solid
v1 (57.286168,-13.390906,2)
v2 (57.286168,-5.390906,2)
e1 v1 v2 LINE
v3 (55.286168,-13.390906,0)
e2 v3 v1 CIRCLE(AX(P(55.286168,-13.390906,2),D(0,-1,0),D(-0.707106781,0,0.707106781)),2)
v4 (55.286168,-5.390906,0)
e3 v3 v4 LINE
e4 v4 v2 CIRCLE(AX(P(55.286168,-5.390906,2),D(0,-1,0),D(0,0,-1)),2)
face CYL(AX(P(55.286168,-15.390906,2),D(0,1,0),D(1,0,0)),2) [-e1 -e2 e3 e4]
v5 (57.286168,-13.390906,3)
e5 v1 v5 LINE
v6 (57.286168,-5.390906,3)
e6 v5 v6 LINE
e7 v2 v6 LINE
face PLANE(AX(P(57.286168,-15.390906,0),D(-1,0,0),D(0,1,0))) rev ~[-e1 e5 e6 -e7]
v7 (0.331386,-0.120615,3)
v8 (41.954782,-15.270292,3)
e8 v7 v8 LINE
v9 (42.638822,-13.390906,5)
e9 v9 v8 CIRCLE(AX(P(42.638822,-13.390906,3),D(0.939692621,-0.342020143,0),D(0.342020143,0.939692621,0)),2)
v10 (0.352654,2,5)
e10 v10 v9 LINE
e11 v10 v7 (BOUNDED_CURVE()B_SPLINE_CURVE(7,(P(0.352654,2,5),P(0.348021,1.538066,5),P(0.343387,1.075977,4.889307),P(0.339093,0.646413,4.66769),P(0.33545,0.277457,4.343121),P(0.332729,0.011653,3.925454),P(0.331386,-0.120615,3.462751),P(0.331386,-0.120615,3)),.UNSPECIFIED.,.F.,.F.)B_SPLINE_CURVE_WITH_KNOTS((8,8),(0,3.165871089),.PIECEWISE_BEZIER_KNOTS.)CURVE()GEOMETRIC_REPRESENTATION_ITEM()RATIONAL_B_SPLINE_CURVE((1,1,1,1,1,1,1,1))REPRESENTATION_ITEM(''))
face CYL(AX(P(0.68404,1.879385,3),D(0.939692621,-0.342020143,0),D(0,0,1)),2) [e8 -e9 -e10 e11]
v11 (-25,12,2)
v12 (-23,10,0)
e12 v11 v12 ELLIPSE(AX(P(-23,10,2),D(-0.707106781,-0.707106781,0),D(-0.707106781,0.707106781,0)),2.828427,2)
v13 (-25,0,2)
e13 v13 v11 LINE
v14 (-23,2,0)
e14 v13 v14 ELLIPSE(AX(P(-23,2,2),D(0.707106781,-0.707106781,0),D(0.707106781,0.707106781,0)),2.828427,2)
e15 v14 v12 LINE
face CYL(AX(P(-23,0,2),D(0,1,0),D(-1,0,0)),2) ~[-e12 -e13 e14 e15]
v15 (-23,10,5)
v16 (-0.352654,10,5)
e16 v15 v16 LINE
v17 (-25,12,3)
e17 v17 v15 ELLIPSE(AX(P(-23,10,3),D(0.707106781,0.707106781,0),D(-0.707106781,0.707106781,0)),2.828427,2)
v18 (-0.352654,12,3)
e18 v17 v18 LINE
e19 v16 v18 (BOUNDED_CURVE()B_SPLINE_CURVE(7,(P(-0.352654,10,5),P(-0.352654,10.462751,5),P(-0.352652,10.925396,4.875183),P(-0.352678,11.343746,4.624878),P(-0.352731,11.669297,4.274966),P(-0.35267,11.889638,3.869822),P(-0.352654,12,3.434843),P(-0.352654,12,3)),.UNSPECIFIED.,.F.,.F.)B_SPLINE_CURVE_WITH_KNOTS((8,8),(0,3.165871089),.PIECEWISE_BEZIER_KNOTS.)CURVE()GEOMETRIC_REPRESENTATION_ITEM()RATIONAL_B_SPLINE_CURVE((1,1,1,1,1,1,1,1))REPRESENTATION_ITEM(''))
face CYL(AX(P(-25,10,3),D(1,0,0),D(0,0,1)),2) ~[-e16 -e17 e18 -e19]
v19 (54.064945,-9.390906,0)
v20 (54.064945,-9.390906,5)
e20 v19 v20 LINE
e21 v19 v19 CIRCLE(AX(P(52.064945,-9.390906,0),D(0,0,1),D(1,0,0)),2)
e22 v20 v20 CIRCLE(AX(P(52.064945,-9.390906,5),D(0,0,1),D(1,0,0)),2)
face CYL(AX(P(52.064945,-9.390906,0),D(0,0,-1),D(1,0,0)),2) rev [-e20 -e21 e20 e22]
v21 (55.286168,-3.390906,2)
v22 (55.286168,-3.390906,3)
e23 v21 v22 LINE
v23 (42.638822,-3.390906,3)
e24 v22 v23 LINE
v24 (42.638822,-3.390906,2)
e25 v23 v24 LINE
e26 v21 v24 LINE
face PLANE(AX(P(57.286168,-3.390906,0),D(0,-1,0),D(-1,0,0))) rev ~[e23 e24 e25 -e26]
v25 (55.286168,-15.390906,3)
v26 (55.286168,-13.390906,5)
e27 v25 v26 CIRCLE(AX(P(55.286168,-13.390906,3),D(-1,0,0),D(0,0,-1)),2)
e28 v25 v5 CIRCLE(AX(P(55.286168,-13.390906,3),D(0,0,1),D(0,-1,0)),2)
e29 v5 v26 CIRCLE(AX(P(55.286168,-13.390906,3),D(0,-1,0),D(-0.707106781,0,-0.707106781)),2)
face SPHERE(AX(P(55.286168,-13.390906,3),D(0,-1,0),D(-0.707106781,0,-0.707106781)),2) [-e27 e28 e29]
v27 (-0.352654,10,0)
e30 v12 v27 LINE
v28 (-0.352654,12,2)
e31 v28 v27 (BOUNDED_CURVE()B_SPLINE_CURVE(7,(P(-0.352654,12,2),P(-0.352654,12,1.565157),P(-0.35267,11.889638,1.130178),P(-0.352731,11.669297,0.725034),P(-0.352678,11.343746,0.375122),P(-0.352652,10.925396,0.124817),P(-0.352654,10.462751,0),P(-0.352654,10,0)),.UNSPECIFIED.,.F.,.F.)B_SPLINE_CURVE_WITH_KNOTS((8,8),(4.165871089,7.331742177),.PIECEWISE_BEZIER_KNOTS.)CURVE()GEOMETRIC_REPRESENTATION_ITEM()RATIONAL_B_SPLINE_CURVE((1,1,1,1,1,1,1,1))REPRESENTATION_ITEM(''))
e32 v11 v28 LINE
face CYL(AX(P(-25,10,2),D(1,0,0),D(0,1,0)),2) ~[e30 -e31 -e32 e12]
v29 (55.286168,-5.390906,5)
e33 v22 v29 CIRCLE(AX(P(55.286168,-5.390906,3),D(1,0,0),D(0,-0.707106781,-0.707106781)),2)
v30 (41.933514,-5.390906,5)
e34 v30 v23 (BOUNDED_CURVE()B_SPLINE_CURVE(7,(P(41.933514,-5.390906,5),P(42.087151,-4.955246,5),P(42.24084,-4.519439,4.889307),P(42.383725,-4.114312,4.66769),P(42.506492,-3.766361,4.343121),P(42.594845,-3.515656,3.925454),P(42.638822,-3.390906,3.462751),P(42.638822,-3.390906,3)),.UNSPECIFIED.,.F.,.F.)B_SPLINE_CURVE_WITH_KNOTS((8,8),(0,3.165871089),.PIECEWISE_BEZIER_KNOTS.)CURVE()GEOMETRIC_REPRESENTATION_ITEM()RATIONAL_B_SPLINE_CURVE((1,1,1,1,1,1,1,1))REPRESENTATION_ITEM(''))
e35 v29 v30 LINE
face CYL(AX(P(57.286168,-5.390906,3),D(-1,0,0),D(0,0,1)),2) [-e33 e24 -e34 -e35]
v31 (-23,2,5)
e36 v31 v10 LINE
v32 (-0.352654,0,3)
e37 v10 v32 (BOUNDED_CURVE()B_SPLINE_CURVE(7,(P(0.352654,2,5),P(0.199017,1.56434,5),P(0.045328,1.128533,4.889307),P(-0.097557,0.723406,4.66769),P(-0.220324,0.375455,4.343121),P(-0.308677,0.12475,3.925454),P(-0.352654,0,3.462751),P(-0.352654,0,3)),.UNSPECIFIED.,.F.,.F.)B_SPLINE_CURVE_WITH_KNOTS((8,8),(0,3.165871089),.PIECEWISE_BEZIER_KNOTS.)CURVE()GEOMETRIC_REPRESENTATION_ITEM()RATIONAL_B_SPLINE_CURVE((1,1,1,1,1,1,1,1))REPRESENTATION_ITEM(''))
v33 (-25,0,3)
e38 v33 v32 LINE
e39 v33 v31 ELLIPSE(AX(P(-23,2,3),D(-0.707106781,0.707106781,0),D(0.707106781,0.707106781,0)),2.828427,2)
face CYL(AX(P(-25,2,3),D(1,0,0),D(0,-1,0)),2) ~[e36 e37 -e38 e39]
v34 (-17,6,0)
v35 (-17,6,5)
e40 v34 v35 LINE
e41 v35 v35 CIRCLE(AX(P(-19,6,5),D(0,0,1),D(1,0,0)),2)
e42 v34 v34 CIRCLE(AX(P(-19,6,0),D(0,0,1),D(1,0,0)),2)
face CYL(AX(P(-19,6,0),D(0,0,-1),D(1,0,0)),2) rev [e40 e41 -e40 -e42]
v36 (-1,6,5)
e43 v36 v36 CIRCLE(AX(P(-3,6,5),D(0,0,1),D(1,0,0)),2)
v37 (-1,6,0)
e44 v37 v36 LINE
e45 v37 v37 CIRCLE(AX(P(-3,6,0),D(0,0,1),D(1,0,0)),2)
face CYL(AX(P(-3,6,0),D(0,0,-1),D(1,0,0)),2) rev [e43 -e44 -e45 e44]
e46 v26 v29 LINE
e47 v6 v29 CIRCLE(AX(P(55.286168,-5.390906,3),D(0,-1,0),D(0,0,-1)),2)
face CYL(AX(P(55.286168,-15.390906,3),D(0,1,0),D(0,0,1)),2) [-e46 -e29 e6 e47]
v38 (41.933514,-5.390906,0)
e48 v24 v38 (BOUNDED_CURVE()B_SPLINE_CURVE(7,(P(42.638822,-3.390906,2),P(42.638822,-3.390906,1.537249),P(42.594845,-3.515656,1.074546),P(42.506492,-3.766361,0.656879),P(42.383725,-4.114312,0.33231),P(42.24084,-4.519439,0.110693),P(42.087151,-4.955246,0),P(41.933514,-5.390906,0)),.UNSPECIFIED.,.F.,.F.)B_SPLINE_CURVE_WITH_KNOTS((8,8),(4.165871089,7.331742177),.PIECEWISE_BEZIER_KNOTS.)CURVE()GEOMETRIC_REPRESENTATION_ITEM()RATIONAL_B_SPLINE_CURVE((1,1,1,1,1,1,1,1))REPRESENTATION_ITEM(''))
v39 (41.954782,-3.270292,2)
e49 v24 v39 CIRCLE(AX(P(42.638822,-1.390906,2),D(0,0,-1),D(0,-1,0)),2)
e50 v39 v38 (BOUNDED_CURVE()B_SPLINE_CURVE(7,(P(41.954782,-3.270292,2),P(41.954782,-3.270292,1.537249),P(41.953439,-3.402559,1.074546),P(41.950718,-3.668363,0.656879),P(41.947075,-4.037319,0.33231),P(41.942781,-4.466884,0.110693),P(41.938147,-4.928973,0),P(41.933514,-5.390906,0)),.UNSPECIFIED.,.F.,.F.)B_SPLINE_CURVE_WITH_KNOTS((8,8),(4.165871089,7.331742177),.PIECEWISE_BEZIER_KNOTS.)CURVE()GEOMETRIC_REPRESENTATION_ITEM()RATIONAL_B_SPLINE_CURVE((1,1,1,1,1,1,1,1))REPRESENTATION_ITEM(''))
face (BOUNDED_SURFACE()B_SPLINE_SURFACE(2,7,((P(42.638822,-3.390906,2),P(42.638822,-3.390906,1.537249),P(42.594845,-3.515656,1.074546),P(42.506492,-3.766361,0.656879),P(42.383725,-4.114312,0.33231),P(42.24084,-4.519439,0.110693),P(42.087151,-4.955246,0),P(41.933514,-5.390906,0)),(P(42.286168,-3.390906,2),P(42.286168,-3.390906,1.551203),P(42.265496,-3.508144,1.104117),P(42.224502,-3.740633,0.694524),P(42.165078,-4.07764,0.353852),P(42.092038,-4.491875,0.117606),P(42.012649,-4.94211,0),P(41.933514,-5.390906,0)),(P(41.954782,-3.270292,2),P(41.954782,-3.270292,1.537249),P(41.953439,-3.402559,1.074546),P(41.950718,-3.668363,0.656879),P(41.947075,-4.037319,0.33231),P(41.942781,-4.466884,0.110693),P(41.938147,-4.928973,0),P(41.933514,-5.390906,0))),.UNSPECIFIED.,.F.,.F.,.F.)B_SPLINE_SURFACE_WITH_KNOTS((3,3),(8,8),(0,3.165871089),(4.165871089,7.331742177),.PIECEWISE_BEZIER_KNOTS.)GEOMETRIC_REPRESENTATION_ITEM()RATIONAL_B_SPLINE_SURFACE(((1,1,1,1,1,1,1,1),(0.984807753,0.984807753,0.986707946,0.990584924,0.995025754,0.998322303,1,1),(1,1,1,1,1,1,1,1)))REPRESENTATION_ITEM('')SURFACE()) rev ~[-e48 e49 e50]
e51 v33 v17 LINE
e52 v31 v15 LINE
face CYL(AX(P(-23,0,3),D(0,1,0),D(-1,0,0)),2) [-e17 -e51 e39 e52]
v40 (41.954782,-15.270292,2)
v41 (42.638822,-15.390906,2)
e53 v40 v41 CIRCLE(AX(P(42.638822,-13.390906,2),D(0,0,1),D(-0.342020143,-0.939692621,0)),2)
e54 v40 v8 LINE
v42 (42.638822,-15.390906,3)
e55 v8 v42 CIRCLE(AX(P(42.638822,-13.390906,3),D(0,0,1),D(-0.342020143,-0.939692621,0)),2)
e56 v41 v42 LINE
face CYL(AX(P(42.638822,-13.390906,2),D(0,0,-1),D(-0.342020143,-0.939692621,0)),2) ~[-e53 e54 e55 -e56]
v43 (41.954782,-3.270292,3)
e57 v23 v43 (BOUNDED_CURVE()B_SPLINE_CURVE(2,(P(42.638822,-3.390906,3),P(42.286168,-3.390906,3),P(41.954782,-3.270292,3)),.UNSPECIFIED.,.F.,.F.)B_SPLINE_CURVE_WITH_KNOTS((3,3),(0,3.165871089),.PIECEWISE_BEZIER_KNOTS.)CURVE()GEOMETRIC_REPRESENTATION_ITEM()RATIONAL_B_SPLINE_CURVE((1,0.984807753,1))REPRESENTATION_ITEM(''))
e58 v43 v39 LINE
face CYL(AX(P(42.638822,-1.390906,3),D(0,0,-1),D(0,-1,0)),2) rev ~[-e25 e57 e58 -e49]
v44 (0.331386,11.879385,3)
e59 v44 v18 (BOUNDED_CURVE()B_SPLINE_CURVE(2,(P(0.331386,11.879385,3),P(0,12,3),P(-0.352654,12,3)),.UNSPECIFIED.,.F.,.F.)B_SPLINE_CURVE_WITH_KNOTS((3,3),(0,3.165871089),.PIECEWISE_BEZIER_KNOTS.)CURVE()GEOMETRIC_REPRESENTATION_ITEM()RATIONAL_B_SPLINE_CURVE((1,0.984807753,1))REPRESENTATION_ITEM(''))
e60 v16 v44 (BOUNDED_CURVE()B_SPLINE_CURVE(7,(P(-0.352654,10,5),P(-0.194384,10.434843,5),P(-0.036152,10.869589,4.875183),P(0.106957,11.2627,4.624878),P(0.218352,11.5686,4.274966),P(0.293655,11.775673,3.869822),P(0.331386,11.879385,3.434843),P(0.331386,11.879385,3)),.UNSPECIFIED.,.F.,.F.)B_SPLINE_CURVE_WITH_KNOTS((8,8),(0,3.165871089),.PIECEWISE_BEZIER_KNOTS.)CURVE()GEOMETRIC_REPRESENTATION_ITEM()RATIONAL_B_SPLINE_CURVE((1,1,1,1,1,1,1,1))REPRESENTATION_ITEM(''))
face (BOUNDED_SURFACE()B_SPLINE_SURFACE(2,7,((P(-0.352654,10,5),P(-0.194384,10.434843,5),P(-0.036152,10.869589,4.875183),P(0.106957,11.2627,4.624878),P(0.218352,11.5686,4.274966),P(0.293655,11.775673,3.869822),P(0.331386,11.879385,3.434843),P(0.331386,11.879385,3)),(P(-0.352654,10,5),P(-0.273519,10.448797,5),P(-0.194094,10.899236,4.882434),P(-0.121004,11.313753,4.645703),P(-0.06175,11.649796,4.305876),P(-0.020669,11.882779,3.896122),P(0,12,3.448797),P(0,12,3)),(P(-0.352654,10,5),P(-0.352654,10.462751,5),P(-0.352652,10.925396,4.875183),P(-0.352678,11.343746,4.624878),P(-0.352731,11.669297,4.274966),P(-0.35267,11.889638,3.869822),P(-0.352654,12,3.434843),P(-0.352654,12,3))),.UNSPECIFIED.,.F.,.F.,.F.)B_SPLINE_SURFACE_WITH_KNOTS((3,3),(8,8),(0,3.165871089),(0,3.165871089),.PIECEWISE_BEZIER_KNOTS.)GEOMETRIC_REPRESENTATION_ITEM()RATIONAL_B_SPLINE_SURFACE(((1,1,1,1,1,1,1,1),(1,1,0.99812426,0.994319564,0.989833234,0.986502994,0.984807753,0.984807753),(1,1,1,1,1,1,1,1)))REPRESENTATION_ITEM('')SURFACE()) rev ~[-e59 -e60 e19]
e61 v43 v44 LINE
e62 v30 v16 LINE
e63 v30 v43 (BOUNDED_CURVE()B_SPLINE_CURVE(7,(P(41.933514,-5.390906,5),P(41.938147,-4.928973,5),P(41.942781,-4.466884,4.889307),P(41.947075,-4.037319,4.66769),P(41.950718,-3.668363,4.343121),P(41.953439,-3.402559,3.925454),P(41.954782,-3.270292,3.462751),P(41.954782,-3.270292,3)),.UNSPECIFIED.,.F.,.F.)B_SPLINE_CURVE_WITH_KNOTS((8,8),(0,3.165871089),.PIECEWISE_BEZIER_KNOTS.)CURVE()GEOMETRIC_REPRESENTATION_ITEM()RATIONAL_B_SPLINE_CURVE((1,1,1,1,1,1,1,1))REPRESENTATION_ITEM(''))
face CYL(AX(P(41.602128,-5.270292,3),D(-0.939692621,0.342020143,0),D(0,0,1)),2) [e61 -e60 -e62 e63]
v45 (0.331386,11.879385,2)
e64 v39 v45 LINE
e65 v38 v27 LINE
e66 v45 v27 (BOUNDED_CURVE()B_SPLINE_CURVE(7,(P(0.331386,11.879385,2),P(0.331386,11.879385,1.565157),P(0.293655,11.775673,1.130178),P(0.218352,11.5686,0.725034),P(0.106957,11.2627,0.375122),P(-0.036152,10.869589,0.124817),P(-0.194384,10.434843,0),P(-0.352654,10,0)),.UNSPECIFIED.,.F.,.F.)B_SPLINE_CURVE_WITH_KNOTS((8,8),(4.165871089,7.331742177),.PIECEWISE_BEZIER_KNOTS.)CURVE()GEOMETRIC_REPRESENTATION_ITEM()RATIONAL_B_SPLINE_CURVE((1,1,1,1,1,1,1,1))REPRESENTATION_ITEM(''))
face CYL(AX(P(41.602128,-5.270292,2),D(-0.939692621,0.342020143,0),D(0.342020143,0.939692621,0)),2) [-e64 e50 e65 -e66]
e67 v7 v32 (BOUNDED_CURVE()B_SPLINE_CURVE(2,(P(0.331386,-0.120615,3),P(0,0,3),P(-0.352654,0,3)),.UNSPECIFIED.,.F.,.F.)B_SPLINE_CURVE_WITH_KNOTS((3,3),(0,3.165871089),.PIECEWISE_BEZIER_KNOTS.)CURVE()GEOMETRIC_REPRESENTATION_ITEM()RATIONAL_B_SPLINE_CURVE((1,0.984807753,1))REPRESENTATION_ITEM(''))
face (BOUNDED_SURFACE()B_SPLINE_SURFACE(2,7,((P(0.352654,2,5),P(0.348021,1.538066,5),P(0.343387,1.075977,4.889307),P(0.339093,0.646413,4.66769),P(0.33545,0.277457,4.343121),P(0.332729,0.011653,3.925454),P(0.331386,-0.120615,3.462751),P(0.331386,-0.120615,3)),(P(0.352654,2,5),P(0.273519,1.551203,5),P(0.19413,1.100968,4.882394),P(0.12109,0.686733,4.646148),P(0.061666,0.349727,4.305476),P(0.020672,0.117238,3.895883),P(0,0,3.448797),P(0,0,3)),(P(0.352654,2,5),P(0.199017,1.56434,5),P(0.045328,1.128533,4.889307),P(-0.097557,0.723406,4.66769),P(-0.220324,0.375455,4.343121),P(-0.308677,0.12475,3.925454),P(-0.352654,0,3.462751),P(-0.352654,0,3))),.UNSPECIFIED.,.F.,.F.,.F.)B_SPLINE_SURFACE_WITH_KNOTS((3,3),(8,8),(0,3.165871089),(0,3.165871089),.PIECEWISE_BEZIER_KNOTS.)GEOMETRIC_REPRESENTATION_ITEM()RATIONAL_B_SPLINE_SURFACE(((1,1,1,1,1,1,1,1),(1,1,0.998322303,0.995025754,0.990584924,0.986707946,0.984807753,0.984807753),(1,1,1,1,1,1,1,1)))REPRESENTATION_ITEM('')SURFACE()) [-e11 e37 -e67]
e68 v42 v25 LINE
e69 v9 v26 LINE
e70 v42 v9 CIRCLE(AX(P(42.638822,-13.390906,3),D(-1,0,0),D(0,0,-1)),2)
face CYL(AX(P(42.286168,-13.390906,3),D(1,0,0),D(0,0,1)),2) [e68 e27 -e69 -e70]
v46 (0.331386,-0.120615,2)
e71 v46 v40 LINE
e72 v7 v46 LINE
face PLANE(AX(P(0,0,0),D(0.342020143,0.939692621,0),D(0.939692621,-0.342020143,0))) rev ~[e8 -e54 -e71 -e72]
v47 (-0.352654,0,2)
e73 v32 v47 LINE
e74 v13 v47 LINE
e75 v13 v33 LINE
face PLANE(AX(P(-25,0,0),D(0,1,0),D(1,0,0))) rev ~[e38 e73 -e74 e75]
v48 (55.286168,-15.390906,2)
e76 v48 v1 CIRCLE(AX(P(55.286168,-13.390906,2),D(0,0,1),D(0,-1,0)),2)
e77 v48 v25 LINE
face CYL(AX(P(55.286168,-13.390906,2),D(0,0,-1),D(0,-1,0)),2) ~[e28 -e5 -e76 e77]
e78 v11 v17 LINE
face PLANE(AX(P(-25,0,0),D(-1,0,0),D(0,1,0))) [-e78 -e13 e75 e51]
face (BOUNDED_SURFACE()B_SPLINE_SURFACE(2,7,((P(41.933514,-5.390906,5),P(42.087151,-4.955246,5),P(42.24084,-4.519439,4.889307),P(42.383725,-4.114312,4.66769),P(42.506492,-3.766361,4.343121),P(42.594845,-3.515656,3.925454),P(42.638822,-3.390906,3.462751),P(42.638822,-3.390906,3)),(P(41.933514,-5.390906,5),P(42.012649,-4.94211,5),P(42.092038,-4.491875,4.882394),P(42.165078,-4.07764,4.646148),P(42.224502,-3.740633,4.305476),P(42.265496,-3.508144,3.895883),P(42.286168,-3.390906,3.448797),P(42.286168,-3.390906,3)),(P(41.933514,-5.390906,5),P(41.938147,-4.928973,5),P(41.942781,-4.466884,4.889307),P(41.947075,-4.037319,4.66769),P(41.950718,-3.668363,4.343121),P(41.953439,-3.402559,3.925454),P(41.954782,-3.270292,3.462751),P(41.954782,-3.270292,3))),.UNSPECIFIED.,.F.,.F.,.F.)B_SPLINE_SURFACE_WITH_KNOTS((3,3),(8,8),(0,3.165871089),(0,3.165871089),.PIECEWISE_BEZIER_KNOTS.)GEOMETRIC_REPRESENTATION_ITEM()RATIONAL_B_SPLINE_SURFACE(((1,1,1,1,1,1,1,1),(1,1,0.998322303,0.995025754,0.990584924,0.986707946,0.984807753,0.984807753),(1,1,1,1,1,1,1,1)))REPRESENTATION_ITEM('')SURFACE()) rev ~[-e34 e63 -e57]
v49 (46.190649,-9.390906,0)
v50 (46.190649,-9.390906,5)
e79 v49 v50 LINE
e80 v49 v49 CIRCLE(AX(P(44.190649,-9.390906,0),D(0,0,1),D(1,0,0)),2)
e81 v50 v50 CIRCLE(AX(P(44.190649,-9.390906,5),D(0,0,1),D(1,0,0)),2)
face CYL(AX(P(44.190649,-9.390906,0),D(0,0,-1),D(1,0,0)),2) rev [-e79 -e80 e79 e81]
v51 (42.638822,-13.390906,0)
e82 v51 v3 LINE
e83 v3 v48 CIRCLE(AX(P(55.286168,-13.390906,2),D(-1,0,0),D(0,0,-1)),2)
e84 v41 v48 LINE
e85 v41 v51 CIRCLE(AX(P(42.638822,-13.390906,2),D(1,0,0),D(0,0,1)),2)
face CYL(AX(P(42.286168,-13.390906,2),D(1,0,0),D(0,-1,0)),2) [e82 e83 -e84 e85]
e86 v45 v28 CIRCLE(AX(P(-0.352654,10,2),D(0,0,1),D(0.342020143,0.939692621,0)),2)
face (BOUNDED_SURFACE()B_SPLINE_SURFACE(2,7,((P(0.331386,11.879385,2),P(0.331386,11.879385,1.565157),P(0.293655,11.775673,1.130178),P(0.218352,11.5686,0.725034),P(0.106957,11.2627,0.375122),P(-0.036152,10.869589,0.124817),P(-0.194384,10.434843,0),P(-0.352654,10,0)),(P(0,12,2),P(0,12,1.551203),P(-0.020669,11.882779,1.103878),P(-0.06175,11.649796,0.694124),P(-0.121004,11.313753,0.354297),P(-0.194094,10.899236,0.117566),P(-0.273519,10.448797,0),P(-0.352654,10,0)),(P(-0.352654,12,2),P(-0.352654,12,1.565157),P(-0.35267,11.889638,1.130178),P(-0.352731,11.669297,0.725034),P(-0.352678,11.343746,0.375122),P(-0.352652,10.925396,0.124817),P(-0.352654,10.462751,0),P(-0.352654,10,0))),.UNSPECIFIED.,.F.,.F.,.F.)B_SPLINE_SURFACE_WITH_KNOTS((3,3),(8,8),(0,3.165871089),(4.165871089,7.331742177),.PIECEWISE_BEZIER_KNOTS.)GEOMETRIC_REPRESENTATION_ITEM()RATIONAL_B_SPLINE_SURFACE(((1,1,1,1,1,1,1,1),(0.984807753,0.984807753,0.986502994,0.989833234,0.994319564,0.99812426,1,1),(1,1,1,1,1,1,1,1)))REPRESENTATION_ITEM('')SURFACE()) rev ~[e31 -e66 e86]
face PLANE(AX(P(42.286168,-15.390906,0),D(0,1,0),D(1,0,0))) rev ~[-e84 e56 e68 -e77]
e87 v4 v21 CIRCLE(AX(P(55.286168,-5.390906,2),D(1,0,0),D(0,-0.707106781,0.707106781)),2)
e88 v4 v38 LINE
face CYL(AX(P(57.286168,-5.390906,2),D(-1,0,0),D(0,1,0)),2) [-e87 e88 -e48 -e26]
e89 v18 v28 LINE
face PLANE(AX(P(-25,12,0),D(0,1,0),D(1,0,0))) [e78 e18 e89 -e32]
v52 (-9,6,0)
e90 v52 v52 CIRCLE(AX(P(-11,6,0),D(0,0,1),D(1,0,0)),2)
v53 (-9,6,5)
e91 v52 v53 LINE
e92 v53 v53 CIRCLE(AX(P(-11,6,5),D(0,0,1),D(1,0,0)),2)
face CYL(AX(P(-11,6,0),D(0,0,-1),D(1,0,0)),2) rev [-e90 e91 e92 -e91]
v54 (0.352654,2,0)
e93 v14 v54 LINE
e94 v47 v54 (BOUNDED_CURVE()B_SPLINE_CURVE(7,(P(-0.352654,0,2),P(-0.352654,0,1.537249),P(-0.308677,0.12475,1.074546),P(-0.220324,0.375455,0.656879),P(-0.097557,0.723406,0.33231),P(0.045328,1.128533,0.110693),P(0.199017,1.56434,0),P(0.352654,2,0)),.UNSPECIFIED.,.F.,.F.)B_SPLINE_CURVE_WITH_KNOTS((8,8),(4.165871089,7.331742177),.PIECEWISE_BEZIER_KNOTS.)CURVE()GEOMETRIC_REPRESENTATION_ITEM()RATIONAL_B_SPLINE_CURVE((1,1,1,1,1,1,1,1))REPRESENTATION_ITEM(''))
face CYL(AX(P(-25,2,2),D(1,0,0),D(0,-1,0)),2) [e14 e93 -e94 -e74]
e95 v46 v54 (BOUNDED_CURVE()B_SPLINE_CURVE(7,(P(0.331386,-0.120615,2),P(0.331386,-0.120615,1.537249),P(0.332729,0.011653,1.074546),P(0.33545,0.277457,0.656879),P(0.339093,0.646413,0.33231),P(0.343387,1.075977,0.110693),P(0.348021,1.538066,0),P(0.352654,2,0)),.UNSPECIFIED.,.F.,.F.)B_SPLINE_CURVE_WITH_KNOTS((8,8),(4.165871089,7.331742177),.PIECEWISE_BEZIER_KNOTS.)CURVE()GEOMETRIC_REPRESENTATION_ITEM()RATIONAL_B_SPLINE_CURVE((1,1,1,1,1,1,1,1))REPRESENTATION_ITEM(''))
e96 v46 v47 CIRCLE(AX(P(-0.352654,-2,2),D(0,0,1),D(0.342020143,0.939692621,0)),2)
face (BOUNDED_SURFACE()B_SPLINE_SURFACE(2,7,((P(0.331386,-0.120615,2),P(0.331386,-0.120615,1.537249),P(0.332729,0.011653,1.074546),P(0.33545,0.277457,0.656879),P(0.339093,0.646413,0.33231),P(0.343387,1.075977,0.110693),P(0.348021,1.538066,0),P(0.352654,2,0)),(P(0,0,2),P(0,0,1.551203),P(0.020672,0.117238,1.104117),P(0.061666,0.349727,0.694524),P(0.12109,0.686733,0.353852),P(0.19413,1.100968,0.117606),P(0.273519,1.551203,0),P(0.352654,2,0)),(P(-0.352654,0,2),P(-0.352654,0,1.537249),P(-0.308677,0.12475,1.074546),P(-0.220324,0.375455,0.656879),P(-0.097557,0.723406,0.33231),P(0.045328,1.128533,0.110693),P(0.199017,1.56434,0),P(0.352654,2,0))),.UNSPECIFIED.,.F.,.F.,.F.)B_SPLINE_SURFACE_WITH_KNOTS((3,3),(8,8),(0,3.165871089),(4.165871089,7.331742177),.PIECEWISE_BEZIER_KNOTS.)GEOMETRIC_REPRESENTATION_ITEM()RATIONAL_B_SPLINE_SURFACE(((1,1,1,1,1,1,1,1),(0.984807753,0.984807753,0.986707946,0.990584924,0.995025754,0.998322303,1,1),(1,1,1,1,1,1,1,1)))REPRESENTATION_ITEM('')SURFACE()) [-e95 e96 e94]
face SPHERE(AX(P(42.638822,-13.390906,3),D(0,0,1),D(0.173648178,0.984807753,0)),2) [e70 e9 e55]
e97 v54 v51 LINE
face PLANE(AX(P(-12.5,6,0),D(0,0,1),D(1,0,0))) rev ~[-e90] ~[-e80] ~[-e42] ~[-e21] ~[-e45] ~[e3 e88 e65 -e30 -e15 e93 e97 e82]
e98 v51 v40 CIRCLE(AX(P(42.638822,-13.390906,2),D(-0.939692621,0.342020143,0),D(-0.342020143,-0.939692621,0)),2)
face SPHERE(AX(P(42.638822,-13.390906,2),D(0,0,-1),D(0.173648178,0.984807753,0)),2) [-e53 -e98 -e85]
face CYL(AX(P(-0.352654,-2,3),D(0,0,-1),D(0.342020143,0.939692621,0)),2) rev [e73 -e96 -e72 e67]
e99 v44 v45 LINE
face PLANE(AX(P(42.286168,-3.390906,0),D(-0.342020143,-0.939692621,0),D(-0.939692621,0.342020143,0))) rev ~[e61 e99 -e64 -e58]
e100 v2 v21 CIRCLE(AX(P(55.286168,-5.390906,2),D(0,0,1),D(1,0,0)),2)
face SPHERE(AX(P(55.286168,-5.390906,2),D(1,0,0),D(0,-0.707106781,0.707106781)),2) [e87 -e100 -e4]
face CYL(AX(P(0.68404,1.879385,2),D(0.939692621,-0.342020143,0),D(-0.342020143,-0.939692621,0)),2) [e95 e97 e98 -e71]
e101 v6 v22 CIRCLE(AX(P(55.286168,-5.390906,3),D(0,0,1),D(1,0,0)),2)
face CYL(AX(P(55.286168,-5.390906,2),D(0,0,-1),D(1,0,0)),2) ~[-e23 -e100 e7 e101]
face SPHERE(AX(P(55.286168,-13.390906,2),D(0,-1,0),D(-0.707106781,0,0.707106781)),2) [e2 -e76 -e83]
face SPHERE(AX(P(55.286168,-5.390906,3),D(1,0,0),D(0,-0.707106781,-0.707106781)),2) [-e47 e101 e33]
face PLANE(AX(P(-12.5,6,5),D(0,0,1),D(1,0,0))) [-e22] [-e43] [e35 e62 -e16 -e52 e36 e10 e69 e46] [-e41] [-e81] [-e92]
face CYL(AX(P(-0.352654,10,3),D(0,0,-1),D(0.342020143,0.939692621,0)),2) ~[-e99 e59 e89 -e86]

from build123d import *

# Parameters (mm, degrees)
F0_W         = 25
F0_H         = 12
F0_R         = 2
F1_DEPTH     = 5
F2_R         = 2
F3_R         = 2
F4_R         = 2
F5_R         = 2
F6_T1_DEPTH  = 1
F6_T6_DEPTH  = 2
F6_T12_DEPTH = 2
F6_S17_W     = 2
F6_S17_H     = 2
F6_T18_DEPTH = 2
F6_S23_W     = 2
F6_S23_H     = 2
F6_T24_DEPTH = 2
F7_T1_DEPTH  = 1
F7_S5_W      = 2
F7_S5_H      = 2
F7_T6_DEPTH  = 2
F7_S11_W     = 2
F7_S11_H     = 2
F7_T12_DEPTH = 2
F8_R         = 2


# Not quite as in the source:
# - a fillet or chamfer that OpenCascade refuses, or shapes differently, is made with other operations: its cross-section is extruded or revolved along the edge and cut away or added


with BuildPart() as f1:
    # F0 (on Top) → F1 (new body)
    with BuildSketch(Plane.XY):
        with Locations((-12.5, 6)):
            Rectangle(F0_W, F0_H)
        with Locations((-19, 6)):
            Circle(F0_R, mode=Mode.SUBTRACT)
        with Locations((-11, 6)):
            Circle(F0_R, mode=Mode.SUBTRACT)
        with Locations((-3, 6)):
            Circle(F0_R, mode=Mode.SUBTRACT)
        Polygon((0, 12), (0, 0), (42.2861679354, -15.3909064497), (57.2861679354, -15.3909064497), (57.2861679354, -3.3909064497), (42.2861679354, -3.3909064497), align=None)
        with Locations((44.1906489432, -9.3909064497)):
            Circle(F0_R, mode=Mode.SUBTRACT)
        with Locations((52.0649450129, -9.3909064497)):
            Circle(F0_R, mode=Mode.SUBTRACT)
    extrude(amount=F1_DEPTH)

    # F2
    f2_edges = [f1.edges().sort_by_distance(p)[0] for p in [
        (-12.5, 0, 0),
        (-25, 6, 0),
        (-12.5, 12, 0),
        (21.143084, 4.304547, 0),
        (49.786168, -3.390906, 0),
        (57.286168, -9.390906, 0),
        (49.786168, -15.390906, 0),
        (21.143084, -7.695453, 0),
    ]]
    fillet(f2_edges, radius=F2_R)

    # F3
    f3_edges = [f1.edges().sort_by_distance(p)[0] for p in [
        (57.286168, -9.390906, 5),
        (49.786168, -15.390906, 5),
        (21.143084, -7.695453, 5),
        (-12.5, 0, 5),
        (-25, 6, 5),
        (-12.5, 12, 5),
        (21.143084, 4.304547, 5),
        (49.786168, -3.390906, 5),
    ]]
    fillet(f3_edges, radius=F3_R)

    # F4
    f4_edges = [f1.edges().sort_by_distance(p)[0] for p in [
        (42.181922, -3.982115, 4.419615),
        (42.286168, -3.390906, 2.5),
        (42.181922, -3.982115, 0.580385),
    ]]
    fillet(f4_edges, radius=F4_R)

    # F5
    f5_edges = [f1.edges().sort_by_distance(p)[0] for p in [
        (0.104246, 0.591209, 4.419615),
        (0, 0, 2.5),
        (0.104246, 0.591209, 0.580385),
    ]]
    fillet(f5_edges, radius=F5_R)

    # F6: fillet of radius 2 on 6 edges, made by hand

    # F6_s2 → F6_t1 (cut)
    with BuildSketch(Plane.XY.offset(2)):
        with BuildLine():
            ThreePointArc((41.9547816101, -15.2702916912), (42.2915255414, -15.3605219557), (42.6388218968, -15.3909064497))
            Line((42.6388218968, -15.3909064497), (42.2861679354, -15.3909064497))
            Line((42.2861679354, -15.3909064497), (41.9547816101, -15.2702916912))
        make_face()
        with BuildLine():
            ThreePointArc((55.2861679354, -15.3909064497), (56.7003814977, -14.805120012), (57.2861679354, -13.3909064497))
            Line((57.2861679354, -13.3909064497), (57.2861679354, -15.3909064497))
            Line((57.2861679354, -15.3909064497), (55.2861679354, -15.3909064497))
        make_face()
    extrude(amount=F6_T1_DEPTH, mode=Mode.SUBTRACT)


with BuildPart() as f6_tool4:
    # F6_s5 → F6_t6 (new body)
    with BuildSketch(Plane.XY.offset(3)):
        Polygon((42.6388218968, -13.3909064497), (41.9547816101, -15.2702916912), (42.2861679354, -15.3909064497), (42.6388218968, -15.3909064497), align=None)
    extrude(amount=F6_T6_DEPTH)

    # F6_s7 → F6_t8 (revolve, cut)
    with BuildSketch(Plane(origin=(42.6388218968, -13.3909064497, 3), x_dir=(0.1736481777, 0.984807753, 0), z_dir=(0.984807753, -0.1736481777, 0))):
        with BuildLine():
            ThreePointArc((0, -2), (2, 0), (0, 2))
            Line((0, 2), (0, -2))
        make_face()
    revolve(axis=Axis((42.6388218968, -13.3909064497, 3), (0, 0, 1)), mode=Mode.SUBTRACT)


with BuildPart() as f1_1:
    add(f1.part)

    # F6_t3: cut F6_tool4
    add(f6_tool4.part, mode=Mode.SUBTRACT)


with BuildPart() as f6_tool10:
    # F6_s11 → F6_t12 (new body)
    with BuildSketch(Plane.XY.offset(2)):
        Polygon((42.6388218968, -13.3909064497), (41.9547816101, -15.2702916912), (42.2861679354, -15.3909064497), (42.6388218968, -15.3909064497), align=None)
    extrude(amount=-F6_T12_DEPTH)

    # F6_s13 → F6_t14 (revolve, cut)
    with BuildSketch(Plane(origin=(42.6388218968, -13.3909064497, 2), x_dir=(0.1736481777, 0.984807753, 0), z_dir=(-0.984807753, 0.1736481777, 0))):
        with BuildLine():
            ThreePointArc((0, -2), (2, 0), (0, 2))
            Line((0, 2), (0, -2))
        make_face()
    revolve(axis=Axis((42.6388218968, -13.3909064497, 2), (0, 0, -1)), mode=Mode.SUBTRACT)


with BuildPart() as f1_2:
    add(f1_1.part)

    # F6_t9: cut F6_tool10
    add(f6_tool10.part, mode=Mode.SUBTRACT)


with BuildPart() as f6_tool16:
    # F6_s17 → F6_t18 (new body)
    with BuildSketch(Plane.XZ.offset(13.3909064497)):
        with Locations((56.2861679354, 4)):
            Rectangle(F6_S17_W, F6_S17_H)
    extrude(amount=F6_T18_DEPTH)

    # F6_s19 → F6_t20 (revolve, cut)
    with BuildSketch(Plane(origin=(55.2861679354, -13.3909064497, 3), x_dir=(-0.7071067812, 0, -0.7071067812), z_dir=(-0.7071067812, 0, 0.7071067812))):
        with BuildLine():
            ThreePointArc((0, -2), (2, 0), (0, 2))
            Line((0, 2), (0, -2))
        make_face()
    revolve(axis=Axis((55.2861679354, -13.3909064497, 3), (0, -1, 0)), mode=Mode.SUBTRACT)


with BuildPart() as f1_3:
    add(f1_2.part)

    # F6_t15: cut F6_tool16
    add(f6_tool16.part, mode=Mode.SUBTRACT)


with BuildPart() as f6_tool22:
    # F6_s23 → F6_t24 (new body)
    with BuildSketch(Plane.XZ.offset(13.3909064497)):
        with Locations((56.2861679354, 1)):
            Rectangle(F6_S23_W, F6_S23_H)
    extrude(amount=F6_T24_DEPTH)

    # F6_s25 → F6_t26 (revolve, cut)
    with BuildSketch(Plane(origin=(55.2861679354, -13.3909064497, 2), x_dir=(-0.7071067812, 0, 0.7071067812), z_dir=(0.7071067812, 0, 0.7071067812))):
        with BuildLine():
            ThreePointArc((0, -2), (2, 0), (0, 2))
            Line((0, 2), (0, -2))
        make_face()
    revolve(axis=Axis((55.2861679354, -13.3909064497, 2), (0, -1, 0)), mode=Mode.SUBTRACT)


with BuildPart() as f1_4:
    add(f1_3.part)

    # F6_t21: cut F6_tool22
    add(f6_tool22.part, mode=Mode.SUBTRACT)

    # F7: fillet of radius 2 on 3 edges, made by hand

    # F7_s2 → F7_t1 (cut)
    with BuildSketch(Plane.XY.offset(2)):
        with BuildLine():
            ThreePointArc((57.2861679354, -5.3909064497), (56.7003814977, -3.9766928873), (55.2861679354, -3.3909064497))
            Line((55.2861679354, -3.3909064497), (57.2861679354, -3.3909064497))
            Line((57.2861679354, -3.3909064497), (57.2861679354, -5.3909064497))
        make_face()
    extrude(amount=F7_T1_DEPTH, mode=Mode.SUBTRACT)


with BuildPart() as f7_tool4:
    # F7_s5 → F7_t6 (new body)
    with BuildSketch(Plane.YZ.offset(55.2861679354)):
        with Locations((-4.3909064497, 4)):
            Rectangle(F7_S5_W, F7_S5_H)
    extrude(amount=F7_T6_DEPTH)

    # F7_s7 → F7_t8 (revolve, cut)
    with BuildSketch(Plane(origin=(55.2861679354, -5.3909064497, 3), x_dir=(0, -0.7071067812, -0.7071067812), z_dir=(0, -0.7071067812, 0.7071067812))):
        with BuildLine():
            ThreePointArc((0, -2), (2, 0), (0, 2))
            Line((0, 2), (0, -2))
        make_face()
    revolve(axis=Axis((55.2861679354, -5.3909064497, 3), (1, 0, 0)), mode=Mode.SUBTRACT)


with BuildPart() as f1_5:
    add(f1_4.part)

    # F7_t3: cut F7_tool4
    add(f7_tool4.part, mode=Mode.SUBTRACT)


with BuildPart() as f7_tool10:
    # F7_s11 → F7_t12 (new body)
    with BuildSketch(Plane.YZ.offset(55.2861679354)):
        with Locations((-4.3909064497, 1)):
            Rectangle(F7_S11_W, F7_S11_H)
    extrude(amount=F7_T12_DEPTH)

    # F7_s13 → F7_t14 (revolve, cut)
    with BuildSketch(Plane(origin=(55.2861679354, -5.3909064497, 2), x_dir=(0, -0.7071067812, 0.7071067812), z_dir=(0, 0.7071067812, 0.7071067812))):
        with BuildLine():
            ThreePointArc((0, -2), (2, 0), (0, 2))
            Line((0, 2), (0, -2))
        make_face()
    revolve(axis=Axis((55.2861679354, -5.3909064497, 2), (1, 0, 0)), mode=Mode.SUBTRACT)


with BuildPart() as f1_6:
    add(f1_5.part)

    # F7_t9: cut F7_tool10
    add(f7_tool10.part, mode=Mode.SUBTRACT)

    # F8
    f8_edges = [f1_6.edges().sort_by_distance(p)[0] for p in [
        (-0.104246, 11.408791, 0.580385),
        (-0.104246, 11.408791, 4.419615),
        (0, 12, 2.5),
    ]]
    fillet(f8_edges, radius=F8_R)


solid = f1_6.part
